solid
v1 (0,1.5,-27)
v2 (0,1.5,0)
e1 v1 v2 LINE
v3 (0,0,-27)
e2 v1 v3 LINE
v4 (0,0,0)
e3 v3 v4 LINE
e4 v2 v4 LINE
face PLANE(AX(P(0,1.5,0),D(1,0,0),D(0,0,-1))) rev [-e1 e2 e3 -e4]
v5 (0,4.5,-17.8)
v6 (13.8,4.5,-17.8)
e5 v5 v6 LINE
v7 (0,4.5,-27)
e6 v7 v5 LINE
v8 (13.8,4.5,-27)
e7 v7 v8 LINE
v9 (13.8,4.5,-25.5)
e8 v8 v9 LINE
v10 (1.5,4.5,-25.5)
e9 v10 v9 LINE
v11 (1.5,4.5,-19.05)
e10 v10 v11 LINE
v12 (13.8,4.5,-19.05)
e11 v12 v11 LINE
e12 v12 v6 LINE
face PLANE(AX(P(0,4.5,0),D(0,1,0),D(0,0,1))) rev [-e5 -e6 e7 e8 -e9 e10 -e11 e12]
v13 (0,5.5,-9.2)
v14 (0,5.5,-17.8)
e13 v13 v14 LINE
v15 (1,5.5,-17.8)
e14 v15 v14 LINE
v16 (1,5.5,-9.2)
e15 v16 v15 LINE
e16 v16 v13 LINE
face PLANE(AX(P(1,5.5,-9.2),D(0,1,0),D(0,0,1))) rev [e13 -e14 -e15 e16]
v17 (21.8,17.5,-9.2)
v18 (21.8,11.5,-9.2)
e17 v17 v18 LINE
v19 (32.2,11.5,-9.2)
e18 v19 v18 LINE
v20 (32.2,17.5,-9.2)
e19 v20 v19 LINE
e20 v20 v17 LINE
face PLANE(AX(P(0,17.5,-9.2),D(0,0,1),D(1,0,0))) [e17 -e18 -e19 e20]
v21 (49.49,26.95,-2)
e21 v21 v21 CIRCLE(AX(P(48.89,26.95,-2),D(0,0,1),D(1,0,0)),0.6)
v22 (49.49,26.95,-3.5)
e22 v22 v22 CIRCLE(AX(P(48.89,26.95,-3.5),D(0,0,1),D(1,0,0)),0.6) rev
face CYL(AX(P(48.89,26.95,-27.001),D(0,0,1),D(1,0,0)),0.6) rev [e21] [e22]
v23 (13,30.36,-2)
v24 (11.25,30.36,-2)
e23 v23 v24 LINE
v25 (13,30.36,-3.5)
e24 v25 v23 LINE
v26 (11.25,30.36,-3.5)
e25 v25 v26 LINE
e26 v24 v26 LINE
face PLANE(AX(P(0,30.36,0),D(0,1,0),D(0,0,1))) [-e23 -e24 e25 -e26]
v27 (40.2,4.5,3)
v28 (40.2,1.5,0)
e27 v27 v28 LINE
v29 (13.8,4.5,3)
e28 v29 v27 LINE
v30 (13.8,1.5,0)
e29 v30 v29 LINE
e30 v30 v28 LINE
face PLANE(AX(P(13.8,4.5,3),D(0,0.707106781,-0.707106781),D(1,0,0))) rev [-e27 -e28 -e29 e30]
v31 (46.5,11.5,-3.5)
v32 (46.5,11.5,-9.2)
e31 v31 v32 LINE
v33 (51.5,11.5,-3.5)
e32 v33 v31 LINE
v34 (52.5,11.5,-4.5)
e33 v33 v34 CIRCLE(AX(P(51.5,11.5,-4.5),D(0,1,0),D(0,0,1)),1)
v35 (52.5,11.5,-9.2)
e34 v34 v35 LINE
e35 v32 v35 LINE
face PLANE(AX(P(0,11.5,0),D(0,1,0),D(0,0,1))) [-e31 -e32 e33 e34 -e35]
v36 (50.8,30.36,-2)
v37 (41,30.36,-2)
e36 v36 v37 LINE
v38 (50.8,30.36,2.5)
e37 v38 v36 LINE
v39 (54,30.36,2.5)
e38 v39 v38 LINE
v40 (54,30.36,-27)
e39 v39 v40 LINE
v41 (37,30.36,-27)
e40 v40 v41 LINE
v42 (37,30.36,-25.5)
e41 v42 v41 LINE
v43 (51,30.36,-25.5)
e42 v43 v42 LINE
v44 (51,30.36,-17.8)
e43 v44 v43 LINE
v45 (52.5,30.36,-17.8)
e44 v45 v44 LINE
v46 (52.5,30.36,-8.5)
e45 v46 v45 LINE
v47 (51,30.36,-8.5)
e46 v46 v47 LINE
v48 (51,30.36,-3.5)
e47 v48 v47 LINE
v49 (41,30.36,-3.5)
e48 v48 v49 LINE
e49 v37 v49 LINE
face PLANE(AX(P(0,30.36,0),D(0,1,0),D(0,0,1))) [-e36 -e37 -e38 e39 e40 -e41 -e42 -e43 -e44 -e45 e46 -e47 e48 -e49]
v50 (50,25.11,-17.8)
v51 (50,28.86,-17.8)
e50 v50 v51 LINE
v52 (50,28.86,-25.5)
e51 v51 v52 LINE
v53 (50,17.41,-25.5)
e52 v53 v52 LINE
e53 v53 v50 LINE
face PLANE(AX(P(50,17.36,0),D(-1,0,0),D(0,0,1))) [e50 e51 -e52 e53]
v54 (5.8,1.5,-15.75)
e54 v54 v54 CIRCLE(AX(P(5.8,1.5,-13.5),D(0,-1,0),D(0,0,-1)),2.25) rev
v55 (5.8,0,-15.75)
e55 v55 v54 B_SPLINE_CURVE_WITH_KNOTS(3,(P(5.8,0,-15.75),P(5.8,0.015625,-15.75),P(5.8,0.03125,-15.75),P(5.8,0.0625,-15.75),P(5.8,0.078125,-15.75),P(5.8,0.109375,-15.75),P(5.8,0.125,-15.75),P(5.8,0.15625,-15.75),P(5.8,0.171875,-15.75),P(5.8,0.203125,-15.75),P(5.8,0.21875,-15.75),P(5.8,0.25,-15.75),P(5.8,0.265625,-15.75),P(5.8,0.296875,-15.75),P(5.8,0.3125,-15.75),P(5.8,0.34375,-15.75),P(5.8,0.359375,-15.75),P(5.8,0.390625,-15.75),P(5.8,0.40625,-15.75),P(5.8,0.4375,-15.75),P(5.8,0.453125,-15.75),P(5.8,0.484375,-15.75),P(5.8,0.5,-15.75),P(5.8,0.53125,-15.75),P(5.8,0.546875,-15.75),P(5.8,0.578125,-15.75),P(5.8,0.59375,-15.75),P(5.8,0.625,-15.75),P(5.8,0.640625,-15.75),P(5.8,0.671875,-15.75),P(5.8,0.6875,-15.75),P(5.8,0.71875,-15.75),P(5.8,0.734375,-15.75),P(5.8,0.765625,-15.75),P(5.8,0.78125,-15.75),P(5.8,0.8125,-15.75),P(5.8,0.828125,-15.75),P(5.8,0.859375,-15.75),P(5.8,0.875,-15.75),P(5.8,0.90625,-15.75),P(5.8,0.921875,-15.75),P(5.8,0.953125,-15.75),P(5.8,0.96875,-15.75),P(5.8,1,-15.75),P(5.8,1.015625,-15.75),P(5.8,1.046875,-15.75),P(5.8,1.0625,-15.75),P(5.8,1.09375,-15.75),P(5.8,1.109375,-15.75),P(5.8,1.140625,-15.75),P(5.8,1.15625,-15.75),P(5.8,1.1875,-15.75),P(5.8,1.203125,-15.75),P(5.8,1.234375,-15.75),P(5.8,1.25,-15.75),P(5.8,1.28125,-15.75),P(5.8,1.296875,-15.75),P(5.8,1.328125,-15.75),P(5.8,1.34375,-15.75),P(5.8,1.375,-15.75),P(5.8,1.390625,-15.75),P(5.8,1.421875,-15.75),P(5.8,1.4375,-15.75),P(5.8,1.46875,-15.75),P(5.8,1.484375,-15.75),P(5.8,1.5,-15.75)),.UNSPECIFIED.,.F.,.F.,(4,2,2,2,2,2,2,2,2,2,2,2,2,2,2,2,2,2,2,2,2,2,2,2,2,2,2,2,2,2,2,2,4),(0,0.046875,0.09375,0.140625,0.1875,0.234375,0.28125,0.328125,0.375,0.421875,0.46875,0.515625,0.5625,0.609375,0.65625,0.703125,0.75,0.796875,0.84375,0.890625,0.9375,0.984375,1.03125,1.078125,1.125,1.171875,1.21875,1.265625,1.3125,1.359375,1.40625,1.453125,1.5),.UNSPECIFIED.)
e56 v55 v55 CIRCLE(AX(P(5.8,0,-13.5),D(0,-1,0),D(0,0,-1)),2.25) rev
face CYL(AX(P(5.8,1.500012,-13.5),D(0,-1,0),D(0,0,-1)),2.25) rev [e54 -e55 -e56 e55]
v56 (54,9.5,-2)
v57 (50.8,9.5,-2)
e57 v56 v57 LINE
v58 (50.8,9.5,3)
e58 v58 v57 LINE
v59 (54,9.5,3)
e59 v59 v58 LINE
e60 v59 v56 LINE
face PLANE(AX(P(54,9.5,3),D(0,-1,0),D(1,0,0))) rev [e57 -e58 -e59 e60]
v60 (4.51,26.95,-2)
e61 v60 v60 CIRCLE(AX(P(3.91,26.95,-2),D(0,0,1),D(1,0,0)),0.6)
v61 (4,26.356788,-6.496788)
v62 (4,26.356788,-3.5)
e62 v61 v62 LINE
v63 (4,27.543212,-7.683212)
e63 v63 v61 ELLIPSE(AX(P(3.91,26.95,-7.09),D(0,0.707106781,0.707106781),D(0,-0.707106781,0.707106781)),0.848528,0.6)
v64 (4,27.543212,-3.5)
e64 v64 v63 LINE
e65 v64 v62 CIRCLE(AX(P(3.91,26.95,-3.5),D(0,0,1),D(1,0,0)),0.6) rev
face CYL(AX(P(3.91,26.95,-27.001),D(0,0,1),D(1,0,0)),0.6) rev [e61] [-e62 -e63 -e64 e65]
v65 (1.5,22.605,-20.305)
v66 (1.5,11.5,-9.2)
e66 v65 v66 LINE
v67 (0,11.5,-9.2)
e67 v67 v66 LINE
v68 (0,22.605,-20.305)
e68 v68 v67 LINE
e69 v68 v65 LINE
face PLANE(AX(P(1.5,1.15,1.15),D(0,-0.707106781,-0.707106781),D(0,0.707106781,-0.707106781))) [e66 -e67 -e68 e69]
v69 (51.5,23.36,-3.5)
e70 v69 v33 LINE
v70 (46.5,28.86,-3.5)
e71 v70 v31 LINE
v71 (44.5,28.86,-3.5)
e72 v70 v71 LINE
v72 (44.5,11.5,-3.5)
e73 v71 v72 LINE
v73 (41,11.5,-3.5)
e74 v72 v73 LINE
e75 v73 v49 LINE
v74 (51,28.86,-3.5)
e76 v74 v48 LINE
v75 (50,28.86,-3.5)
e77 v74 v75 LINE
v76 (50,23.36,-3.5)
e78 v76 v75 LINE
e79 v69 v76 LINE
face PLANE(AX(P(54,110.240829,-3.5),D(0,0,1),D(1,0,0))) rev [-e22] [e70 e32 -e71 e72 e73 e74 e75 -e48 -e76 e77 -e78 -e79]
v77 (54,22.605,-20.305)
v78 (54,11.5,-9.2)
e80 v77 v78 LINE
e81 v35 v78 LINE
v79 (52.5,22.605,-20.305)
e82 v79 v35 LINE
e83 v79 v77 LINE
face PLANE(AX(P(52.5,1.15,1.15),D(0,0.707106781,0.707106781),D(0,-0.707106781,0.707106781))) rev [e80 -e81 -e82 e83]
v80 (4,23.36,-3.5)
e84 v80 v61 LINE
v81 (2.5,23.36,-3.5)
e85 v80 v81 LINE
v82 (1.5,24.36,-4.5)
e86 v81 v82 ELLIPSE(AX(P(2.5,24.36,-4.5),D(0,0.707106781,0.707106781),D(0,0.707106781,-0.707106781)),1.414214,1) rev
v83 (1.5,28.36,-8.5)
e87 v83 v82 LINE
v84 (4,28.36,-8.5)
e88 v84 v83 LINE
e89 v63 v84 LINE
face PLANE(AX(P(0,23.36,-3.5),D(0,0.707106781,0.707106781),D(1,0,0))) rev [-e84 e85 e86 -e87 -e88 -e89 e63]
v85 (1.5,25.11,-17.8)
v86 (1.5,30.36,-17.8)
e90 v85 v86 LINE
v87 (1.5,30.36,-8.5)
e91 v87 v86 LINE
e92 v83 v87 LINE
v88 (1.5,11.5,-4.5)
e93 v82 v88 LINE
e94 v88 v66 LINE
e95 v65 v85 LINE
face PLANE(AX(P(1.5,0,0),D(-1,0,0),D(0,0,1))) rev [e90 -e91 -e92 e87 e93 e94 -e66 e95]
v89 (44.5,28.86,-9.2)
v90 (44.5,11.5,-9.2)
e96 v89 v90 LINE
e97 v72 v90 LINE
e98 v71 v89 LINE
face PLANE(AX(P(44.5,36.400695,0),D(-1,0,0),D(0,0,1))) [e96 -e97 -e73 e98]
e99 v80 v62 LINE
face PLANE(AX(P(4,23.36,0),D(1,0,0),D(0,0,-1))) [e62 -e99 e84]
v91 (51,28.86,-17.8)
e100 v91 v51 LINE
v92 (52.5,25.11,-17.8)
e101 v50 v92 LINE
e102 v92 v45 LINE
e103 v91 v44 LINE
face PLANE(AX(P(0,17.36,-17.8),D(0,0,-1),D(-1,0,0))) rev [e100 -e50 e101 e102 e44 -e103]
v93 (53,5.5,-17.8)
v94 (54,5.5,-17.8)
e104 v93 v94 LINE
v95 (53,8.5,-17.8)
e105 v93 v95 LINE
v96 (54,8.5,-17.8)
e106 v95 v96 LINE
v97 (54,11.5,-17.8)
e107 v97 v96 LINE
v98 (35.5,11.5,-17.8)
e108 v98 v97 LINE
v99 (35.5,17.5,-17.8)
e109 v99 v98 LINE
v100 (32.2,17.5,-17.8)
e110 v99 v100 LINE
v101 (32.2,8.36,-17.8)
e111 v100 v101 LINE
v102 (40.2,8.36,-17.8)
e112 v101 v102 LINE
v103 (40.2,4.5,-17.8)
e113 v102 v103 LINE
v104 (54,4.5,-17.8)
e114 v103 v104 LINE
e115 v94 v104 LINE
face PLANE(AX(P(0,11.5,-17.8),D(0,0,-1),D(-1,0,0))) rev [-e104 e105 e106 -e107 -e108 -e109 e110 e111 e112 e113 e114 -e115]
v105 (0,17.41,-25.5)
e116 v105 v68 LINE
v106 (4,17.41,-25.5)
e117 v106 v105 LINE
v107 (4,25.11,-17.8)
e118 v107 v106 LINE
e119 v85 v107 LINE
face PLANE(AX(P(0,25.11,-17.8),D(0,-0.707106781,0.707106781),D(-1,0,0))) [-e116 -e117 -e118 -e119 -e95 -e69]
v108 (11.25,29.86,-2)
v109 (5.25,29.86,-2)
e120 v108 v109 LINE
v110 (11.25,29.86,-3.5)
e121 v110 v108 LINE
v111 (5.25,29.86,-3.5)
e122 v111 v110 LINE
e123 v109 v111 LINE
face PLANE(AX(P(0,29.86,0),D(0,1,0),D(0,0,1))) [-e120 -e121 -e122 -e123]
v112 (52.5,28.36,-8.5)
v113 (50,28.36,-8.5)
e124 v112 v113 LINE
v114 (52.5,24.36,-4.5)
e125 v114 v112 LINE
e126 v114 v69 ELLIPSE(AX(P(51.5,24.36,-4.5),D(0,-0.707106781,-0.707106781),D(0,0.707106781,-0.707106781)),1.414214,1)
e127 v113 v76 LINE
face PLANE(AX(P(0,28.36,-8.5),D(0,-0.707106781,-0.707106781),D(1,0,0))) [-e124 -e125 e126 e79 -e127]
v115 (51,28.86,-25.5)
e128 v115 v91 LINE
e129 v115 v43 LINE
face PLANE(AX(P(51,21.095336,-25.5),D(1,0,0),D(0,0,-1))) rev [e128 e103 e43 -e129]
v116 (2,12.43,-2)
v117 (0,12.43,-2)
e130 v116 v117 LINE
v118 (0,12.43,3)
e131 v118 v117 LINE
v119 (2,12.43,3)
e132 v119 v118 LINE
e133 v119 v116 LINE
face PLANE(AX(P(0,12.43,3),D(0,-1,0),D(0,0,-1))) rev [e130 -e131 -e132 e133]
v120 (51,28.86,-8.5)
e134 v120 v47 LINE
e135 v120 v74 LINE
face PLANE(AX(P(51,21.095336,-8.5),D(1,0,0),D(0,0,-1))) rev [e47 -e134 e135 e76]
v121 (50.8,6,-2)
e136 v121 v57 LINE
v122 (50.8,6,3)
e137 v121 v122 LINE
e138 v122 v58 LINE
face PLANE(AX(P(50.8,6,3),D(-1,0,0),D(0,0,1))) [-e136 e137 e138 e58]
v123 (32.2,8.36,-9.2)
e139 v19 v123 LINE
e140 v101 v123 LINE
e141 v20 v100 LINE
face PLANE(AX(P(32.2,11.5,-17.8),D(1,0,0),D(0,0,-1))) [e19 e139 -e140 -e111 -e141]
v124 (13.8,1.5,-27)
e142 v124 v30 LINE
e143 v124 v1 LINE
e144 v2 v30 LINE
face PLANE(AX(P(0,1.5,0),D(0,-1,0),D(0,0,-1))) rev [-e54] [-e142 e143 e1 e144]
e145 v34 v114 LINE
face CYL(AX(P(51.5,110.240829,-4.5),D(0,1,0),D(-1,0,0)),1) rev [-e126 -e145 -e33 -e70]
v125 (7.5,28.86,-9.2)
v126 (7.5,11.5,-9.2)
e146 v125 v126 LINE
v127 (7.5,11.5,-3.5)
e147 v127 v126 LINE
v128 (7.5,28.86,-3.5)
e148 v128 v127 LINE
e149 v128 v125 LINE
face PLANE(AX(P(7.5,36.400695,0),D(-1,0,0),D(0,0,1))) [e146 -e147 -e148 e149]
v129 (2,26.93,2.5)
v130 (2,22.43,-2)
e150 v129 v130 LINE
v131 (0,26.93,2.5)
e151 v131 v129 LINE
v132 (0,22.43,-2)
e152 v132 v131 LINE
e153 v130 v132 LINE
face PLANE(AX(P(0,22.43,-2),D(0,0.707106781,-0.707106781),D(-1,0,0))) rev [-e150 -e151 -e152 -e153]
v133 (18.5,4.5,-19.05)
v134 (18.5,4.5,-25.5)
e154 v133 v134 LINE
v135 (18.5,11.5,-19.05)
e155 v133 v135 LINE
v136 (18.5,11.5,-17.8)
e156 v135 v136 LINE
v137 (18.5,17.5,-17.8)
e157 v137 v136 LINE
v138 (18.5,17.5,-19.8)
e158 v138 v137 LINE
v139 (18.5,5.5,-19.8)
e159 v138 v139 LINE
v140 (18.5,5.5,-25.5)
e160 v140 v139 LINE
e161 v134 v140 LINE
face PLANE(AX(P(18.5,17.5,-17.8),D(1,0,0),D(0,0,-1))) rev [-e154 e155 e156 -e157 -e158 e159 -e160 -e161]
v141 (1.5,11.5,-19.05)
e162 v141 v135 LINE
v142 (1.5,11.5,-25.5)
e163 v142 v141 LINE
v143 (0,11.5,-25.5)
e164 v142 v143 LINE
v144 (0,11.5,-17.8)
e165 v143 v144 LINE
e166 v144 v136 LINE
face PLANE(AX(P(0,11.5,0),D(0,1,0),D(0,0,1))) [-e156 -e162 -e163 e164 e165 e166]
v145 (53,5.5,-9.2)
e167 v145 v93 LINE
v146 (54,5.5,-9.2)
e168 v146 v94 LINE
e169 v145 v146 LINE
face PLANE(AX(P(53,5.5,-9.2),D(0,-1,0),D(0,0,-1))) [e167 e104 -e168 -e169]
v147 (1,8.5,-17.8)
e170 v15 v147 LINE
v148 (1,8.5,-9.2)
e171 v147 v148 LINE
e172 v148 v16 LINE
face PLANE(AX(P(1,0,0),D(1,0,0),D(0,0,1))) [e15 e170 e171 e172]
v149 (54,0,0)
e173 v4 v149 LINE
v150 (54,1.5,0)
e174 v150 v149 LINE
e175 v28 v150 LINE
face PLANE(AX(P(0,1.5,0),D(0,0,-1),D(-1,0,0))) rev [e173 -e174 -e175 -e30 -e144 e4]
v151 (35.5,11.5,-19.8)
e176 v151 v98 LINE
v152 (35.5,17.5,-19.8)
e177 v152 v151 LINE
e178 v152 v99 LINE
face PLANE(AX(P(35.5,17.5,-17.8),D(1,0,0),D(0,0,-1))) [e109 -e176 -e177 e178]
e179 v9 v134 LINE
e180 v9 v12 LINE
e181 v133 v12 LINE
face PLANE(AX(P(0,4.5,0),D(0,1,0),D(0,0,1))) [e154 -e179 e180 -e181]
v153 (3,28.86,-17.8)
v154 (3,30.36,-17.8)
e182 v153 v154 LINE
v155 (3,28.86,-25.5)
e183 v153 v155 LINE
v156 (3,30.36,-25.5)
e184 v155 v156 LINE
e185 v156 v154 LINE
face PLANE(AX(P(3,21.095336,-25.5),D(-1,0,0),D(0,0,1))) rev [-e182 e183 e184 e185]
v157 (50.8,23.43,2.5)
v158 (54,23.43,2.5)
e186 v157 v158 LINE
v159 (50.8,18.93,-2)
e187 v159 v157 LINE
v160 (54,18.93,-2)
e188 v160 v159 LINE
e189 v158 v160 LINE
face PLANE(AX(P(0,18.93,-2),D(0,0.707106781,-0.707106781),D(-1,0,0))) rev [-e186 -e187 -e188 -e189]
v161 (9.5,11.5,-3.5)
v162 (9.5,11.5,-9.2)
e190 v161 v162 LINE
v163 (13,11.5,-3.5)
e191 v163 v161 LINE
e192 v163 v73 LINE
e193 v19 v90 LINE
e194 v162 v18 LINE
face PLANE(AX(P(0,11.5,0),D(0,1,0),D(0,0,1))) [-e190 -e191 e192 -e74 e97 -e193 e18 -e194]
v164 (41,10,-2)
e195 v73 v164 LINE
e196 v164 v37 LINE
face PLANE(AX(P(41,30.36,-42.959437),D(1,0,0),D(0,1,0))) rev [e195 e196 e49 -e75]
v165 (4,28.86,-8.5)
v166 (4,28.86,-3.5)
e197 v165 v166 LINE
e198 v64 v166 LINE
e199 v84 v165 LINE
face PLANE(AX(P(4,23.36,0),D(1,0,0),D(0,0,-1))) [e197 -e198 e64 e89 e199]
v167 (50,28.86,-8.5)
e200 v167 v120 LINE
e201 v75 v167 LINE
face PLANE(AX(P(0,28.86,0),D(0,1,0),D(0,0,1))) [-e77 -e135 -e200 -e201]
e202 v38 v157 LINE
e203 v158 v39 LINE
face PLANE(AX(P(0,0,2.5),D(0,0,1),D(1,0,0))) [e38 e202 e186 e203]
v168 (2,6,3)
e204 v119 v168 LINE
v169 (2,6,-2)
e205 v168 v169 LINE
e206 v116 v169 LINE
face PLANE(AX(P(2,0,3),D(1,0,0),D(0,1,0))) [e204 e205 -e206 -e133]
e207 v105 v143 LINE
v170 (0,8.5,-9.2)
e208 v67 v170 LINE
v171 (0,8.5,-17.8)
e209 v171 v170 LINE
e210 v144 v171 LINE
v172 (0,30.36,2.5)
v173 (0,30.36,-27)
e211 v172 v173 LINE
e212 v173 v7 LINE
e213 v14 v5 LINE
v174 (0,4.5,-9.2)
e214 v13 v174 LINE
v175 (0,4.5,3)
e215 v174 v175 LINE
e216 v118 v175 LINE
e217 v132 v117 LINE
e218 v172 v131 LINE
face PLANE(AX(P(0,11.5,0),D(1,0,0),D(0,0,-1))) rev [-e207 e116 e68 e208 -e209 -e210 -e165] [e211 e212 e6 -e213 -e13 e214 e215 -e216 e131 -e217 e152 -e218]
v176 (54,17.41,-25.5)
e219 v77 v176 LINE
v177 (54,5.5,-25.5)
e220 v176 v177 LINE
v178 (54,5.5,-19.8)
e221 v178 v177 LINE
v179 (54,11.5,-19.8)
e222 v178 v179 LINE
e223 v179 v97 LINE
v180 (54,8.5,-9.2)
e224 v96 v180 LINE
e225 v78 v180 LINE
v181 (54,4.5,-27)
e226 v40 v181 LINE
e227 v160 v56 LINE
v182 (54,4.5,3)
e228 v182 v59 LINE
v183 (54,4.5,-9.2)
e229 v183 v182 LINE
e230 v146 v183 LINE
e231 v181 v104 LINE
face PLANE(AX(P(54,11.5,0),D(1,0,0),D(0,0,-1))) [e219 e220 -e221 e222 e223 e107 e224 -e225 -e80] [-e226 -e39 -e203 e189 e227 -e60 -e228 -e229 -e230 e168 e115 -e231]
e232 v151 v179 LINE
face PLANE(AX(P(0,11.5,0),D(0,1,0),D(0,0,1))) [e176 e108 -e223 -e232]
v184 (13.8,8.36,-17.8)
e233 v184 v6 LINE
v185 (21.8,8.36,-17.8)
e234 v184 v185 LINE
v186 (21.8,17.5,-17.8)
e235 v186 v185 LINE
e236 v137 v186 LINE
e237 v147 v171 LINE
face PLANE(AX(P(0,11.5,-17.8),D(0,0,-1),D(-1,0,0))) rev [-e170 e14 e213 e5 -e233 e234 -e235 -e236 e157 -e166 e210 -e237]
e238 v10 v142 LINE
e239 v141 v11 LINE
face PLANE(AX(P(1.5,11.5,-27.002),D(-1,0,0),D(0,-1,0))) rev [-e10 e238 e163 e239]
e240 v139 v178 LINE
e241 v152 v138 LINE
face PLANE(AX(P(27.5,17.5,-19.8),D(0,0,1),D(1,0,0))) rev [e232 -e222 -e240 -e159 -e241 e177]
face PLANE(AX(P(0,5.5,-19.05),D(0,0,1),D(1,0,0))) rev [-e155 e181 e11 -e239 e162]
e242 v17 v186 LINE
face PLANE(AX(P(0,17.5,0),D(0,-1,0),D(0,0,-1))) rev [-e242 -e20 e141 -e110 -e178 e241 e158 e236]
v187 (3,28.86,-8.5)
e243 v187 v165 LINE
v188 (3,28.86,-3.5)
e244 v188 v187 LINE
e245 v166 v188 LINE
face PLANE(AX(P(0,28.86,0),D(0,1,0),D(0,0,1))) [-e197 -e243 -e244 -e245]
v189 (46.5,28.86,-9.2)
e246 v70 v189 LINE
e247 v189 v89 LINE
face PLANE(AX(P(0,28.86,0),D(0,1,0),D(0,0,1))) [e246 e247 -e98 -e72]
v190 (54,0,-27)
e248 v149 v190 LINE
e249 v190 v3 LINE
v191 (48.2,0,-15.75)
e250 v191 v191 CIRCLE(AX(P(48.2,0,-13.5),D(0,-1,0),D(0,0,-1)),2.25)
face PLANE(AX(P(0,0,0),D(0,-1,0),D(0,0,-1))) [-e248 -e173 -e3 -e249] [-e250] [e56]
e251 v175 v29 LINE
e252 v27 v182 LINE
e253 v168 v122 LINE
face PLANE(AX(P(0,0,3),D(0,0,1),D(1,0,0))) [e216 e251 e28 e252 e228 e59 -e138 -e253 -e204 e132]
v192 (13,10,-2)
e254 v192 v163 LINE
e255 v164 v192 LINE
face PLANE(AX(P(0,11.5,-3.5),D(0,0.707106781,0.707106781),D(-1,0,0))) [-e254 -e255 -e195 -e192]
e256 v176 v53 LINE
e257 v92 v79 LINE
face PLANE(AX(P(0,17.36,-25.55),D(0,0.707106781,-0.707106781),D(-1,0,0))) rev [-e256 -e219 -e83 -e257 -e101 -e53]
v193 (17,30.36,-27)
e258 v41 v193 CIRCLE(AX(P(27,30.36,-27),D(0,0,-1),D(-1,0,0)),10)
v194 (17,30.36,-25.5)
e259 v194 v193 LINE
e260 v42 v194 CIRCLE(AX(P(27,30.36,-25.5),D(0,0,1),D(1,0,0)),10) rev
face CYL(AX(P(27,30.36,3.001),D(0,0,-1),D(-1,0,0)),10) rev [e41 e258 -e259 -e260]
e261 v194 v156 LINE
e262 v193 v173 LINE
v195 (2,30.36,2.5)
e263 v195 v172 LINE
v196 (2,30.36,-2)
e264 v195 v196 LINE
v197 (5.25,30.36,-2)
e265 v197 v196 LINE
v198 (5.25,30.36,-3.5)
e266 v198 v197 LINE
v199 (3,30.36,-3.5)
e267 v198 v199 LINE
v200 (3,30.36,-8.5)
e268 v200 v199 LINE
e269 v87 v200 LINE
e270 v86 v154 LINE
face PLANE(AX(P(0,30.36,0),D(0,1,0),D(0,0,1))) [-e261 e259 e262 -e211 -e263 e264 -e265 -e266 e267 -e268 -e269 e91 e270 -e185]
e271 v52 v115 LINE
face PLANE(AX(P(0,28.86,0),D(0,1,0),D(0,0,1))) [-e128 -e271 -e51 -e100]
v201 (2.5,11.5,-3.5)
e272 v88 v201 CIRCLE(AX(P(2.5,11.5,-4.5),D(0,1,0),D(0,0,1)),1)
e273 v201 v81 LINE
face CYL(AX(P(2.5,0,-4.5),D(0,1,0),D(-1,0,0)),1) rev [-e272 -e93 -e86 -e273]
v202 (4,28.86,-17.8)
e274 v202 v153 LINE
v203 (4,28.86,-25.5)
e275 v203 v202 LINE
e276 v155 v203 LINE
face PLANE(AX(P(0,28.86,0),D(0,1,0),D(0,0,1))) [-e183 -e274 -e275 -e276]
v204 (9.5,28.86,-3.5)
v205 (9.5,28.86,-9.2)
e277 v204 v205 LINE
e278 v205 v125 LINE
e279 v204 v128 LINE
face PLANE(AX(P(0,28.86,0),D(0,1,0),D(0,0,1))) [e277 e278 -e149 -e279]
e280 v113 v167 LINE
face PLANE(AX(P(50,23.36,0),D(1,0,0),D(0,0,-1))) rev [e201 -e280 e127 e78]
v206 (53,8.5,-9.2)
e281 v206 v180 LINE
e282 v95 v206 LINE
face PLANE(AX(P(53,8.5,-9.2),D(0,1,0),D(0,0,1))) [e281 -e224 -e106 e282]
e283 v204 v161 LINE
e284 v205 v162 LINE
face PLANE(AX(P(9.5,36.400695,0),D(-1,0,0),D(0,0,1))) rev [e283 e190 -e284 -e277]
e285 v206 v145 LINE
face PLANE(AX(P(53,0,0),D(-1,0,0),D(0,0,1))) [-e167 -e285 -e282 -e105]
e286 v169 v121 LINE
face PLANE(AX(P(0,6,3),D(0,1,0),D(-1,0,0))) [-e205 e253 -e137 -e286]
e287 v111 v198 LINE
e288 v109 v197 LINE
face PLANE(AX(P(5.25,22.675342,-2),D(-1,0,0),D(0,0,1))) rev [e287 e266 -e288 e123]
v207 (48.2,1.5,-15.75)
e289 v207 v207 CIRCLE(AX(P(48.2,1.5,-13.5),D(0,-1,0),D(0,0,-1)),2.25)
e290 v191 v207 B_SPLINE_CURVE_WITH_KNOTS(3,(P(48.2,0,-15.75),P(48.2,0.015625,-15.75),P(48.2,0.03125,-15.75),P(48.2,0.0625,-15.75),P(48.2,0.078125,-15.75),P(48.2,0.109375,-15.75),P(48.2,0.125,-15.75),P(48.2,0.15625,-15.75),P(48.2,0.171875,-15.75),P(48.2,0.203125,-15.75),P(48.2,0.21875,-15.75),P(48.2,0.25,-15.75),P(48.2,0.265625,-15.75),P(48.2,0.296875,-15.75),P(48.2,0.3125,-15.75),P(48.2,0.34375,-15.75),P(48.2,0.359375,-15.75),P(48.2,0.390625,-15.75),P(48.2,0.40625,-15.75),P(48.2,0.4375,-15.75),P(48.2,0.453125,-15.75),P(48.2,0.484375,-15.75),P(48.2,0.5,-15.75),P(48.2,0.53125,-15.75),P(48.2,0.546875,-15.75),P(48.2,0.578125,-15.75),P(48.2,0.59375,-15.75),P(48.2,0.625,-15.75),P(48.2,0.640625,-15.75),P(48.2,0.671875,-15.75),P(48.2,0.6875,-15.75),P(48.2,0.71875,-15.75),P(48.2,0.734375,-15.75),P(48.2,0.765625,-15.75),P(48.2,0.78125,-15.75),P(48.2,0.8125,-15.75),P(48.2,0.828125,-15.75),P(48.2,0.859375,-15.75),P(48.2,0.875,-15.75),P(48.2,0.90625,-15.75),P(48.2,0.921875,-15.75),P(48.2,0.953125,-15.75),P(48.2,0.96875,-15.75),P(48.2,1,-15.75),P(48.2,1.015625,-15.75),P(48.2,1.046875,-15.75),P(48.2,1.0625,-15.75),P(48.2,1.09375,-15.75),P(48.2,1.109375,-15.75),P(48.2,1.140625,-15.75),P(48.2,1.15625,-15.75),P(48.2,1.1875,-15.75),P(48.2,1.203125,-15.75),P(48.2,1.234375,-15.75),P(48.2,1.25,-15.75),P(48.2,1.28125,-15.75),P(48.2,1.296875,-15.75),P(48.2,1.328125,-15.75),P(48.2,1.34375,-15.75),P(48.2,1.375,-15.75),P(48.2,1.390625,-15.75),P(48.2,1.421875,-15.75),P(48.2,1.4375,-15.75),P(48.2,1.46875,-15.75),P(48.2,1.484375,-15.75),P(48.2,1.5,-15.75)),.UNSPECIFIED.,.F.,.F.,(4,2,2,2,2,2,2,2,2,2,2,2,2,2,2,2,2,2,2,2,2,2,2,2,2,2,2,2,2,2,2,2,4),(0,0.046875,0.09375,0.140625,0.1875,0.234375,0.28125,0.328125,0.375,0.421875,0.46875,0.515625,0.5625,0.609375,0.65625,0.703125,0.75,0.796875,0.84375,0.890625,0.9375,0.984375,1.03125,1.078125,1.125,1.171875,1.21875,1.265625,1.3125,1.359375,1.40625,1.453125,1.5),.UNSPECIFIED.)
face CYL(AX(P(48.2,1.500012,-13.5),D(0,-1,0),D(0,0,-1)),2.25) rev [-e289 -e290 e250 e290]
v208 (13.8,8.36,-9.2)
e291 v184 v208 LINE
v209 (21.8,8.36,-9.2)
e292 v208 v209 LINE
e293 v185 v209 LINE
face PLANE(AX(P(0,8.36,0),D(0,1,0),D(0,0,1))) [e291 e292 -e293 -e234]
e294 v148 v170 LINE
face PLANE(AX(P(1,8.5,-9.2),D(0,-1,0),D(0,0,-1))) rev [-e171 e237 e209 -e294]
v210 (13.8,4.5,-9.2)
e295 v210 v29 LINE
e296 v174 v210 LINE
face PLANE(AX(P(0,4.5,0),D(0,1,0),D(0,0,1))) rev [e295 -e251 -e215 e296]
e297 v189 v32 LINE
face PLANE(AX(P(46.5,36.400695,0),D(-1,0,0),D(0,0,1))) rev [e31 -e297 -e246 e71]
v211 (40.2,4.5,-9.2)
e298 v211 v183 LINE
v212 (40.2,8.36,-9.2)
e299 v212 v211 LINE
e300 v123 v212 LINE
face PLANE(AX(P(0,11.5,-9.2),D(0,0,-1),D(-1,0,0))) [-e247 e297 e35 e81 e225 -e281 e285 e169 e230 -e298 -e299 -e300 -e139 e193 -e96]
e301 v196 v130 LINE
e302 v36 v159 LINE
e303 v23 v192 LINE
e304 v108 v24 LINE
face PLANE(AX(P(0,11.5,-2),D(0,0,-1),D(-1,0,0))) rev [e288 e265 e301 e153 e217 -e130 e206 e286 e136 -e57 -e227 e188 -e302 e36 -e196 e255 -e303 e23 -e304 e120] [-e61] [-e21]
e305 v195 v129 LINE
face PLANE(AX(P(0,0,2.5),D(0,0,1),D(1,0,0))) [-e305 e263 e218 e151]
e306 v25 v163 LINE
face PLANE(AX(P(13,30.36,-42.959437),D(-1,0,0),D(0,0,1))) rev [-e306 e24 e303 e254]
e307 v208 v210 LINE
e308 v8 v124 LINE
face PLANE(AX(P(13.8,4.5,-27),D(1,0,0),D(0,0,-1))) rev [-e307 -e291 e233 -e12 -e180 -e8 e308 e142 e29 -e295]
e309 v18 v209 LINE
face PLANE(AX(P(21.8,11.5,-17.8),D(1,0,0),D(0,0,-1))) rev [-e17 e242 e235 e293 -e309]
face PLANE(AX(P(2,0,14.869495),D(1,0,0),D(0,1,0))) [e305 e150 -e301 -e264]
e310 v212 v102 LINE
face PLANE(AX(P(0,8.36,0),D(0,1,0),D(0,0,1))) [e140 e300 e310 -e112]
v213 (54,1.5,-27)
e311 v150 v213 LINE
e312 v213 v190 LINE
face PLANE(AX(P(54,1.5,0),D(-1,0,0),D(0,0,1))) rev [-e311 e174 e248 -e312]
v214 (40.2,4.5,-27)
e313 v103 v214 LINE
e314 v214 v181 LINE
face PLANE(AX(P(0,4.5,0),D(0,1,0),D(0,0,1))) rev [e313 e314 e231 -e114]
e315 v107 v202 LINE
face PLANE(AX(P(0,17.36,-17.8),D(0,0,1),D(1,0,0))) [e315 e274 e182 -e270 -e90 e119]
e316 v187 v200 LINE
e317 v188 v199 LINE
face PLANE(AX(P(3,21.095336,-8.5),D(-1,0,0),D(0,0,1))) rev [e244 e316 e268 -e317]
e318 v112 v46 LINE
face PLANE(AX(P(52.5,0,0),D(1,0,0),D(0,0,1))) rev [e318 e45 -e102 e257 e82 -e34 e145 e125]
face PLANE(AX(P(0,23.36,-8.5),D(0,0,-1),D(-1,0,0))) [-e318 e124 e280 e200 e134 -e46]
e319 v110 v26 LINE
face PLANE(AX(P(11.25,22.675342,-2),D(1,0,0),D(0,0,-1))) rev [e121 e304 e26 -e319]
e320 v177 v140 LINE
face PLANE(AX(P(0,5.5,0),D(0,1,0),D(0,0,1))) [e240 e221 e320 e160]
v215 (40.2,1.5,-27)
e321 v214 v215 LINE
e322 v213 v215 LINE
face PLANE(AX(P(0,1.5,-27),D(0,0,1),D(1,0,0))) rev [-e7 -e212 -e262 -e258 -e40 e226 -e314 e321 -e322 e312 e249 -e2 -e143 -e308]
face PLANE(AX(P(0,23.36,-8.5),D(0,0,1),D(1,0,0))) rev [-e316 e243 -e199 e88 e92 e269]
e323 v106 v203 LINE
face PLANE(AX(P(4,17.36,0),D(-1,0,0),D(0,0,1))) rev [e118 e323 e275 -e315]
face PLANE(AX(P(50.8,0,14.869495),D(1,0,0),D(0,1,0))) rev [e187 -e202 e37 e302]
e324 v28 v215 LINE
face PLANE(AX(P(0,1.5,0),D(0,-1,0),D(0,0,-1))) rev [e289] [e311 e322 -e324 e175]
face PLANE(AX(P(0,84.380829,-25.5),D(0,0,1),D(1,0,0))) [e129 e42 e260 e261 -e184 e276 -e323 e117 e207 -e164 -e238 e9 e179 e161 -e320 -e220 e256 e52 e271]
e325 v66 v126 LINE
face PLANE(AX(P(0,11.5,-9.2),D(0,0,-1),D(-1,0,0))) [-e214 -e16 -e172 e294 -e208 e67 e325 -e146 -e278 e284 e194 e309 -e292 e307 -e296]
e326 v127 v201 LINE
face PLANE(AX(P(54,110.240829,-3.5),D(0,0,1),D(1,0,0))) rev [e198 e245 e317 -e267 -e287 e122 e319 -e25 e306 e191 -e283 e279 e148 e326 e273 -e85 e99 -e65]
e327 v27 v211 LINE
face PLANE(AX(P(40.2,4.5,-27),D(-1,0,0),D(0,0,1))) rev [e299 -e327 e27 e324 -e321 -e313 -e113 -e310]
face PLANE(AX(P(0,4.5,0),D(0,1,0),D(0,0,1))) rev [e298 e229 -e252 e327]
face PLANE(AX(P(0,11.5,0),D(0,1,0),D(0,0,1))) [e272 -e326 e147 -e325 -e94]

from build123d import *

# Parameters (mm, degrees)
SKETCH1_W                      = 54
SKETCH1_H                      = 27
BOSS_EXTRUDE1_DEPTH            = 1.5
CUT_EXTRUDE1_REACH             = 62.392
SKETCH2_R                      = 2.25
CUT_EXTRUDE1_DIRECTION_2_DEPTH = 61.392466418
SKETCH3_W                      = 26.4
SKETCH3_H                      = 30
BOSS_EXTRUDE2_DEPTH            = 3
CHAMFER3_SIZE                  = 3
BOSS_EXTRUDE3_DEPTH            = 7
SKETCH25_W                     = 8.6
SKETCH25_H                     = 3
BOSS_EXTRUDE19_DEPTH           = 1
BOSS_EXTRUDE15_START           = 7
SKETCH4_4_W                    = 10.4
SKETCH4_4_H                    = 8.6
BOSS_EXTRUDE15_DEPTH           = 6
SKETCH5_W                      = 54
SKETCH5_H                      = 1.5
BOSS_EXTRUDE5_DEPTH            = 18.86
SKETCH5_3_W                    = 2
SKETCH5_3_H                    = 5.7
BOSS_EXTRUDE6_DEPTH            = 17.36
SKETCH4_3_W                    = 8
SKETCH4_3_H                    = 8.6
BOSS_EXTRUDE12_DEPTH           = 3.86
SKETCH17_W                     = 2
SKETCH17_H                     = 6.43
SKETCH17_W_2                   = 3.2
SKETCH17_H_2                   = 3.5
BOSS_EXTRUDE13_DEPTH           = 5
SKETCH17_3_W                   = 2
SKETCH17_3_H                   = 7.93
SKETCH17_3_W_2                 = 3.2
SKETCH17_3_H_2                 = 11.43
BOSS_EXTRUDE16_DEPTH           = 4.5
CHAMFER7_SIZE                  = 4.5
SKETCH5_4_W                    = 54
SKETCH5_4_H                    = 1.5
BOSS_EXTRUDE8_DEPTH            = 18.86
BOSS_EXTRUDE9_DEPTH            = 1.5
SKETCH18_W                     = 4
SKETCH18_H                     = 7.7
BOSS_EXTRUDE14_DEPTH           = 13
SKETCH18_3_W                   = 2.5
SKETCH18_3_H                   = 5
BOSS_EXTRUDE17_DEPTH           = 7
CHAMFER8_SIZE                  = 5
CHAMFER6_SIZE                  = 7.75
SKETCH20_W                     = 1
SKETCH20_H                     = 7.7
SKETCH20_H_2                   = 5
CUT_EXTRUDE7_DEPTH             = 1.5
SKETCH22_W                     = 6
SKETCH22_H                     = 1.5
CUT_EXTRUDE10_DEPTH            = 0.5
SKETCH12_W                     = 28
SKETCH12_H                     = 18.86
CUT_EXTRUDE2_DEPTH             = 7.2
CUT_EXTRUDE3_DEPTH             = 1.5
SKETCH15_W                     = 9
SKETCH15_H                     = 2
BOSS_EXTRUDE11_DEPTH           = 6
SKETCH21_W                     = 18.5
SKETCH21_H                     = 5.7
SKETCH21_H_2                   = 0.75
CUT_EXTRUDE8_DEPTH             = 6
CUT_EXTRUDE9_START             = -6
SKETCH21_3_W                   = 18.5
SKETCH21_3_H                   = 5.7
SKETCH21_3_H_2                 = 0.75
CUT_EXTRUDE9_DEPTH             = 1
FILLET7_R                      = 1
CUT_EXTRUDE11_REACH            = 68.804
SKETCH23_R                     = 0.6
CHAMFER9_SIZE                  = 1.5
BOSS_EXTRUDE18_REACH           = 67.757
SKETCH24_W                     = 1.5
SKETCH24_H                     = 7


# Some blends are built 0.0001 mm under size
with BuildPart() as part:
    # Sketch1 → Boss-Extrude1 (new body)
    with BuildSketch(Plane(origin=(0, 0, 0), x_dir=(1, 0, 0), z_dir=(0, 1, 0))):
        with Locations((27, 13.5)):
            Rectangle(SKETCH1_W, SKETCH1_H)
    extrude(amount=BOSS_EXTRUDE1_DEPTH)

    # Sketch2 → Cut-Extrude1 (cut, up to next)
    with BuildSketch(Plane(origin=(0, 1.5, 0), x_dir=(1, 0, 0), z_dir=(0, 1, 0)), mode=Mode.PRIVATE) as cut_extrude1_sk1:
        with Locations(Location((5.8, 13.5, 0), (0, 0, 90))):
            Circle(SKETCH2_R)
    cut_extrude1_tool1 = extrude(cut_extrude1_sk1.sketch, amount=-CUT_EXTRUDE1_REACH, mode=Mode.PRIVATE) & part.part
    cut_extrude1 = cut_extrude1_tool1.solids().sort_by_distance((5.8, 1.5, -13.5))[0]
    add(cut_extrude1, mode=Mode.SUBTRACT)

    # Sketch2 → Cut-Extrude1 direction 2 (cut)
    with BuildSketch(Plane(origin=(0, 1.5, 0), x_dir=(1, 0, 0), z_dir=(0, 1, 0))):
        with Locations(Location((5.8, 13.5, 0), (0, 0, 90))):
            Circle(SKETCH2_R)
    cut_extrude1_direction_2 = extrude(amount=CUT_EXTRUDE1_DIRECTION_2_DEPTH, mode=Mode.SUBTRACT)

    # Mirror1: Cut-Extrude1, Cut-Extrude1 direction 2 across plane
    add(cut_extrude1.mirror(Plane.ZY.offset(-27)), mode=Mode.SUBTRACT)
    add(cut_extrude1_direction_2.mirror(Plane.ZY.offset(-27)), mode=Mode.SUBTRACT)

    # Sketch3 → Boss-Extrude2 (add)
    with BuildSketch(Plane(origin=(0, 1.5, 0), x_dir=(1, 0, 0), z_dir=(0, 1, 0))):
        with Locations((27, 12)):
            Rectangle(SKETCH3_W, SKETCH3_H)
    extrude(amount=BOSS_EXTRUDE2_DEPTH)

    # Chamfer3
    chamfer3_edges = [part.edges().sort_by_distance(p)[0] for p in [
        (27, 1.5, 3),
    ]]
    chamfer(chamfer3_edges, length=CHAMFER3_SIZE - 0.0001)  # a hair under: the kernel refuses the full size

    # Sketch4 → Boss-Extrude3 (add)
    with BuildSketch(Plane(origin=(0, 4.5, 0), x_dir=(1, 0, 0), z_dir=(0, 1, 0))):
        Polygon((54, 27), (0, 27), (0, 17.8), (21.8, 17.8), (21.8, 9.2), (0, 9.2), (0, 2), (54, 2), (54, 9.2), (32.2, 9.2), (32.2, 17.8), (54, 17.8), align=None)
    extrude(amount=BOSS_EXTRUDE3_DEPTH)

    # Sketch25 → Boss-Extrude19 (add)
    with BuildSketch(Plane(origin=(54, 0, 0), x_dir=(0, 0, -1), z_dir=(1, 0, 0))):
        with Locations((13.5, 7)):
            Rectangle(SKETCH25_W, SKETCH25_H)
    boss_extrude19 = extrude(amount=-BOSS_EXTRUDE19_DEPTH)

    # Mirror6: Boss-Extrude19 across plane
    add(boss_extrude19.mirror(Plane.ZY.offset(-27)))

    # Sketch4<4> → Boss-Extrude15 (add)
    with BuildSketch(Plane(origin=(0, 4.5, 0), x_dir=(1, 0, 0), z_dir=(0, 1, 0)).offset(BOSS_EXTRUDE15_START)):
        with Locations((27, 13.5)):
            Rectangle(SKETCH4_4_W, SKETCH4_4_H)
    extrude(amount=BOSS_EXTRUDE15_DEPTH)

    # Sketch5 → Boss-Extrude5 (add)
    with BuildSketch(Plane(origin=(0, 11.5, 0), x_dir=(1, 0, 0), z_dir=(0, 1, 0))):
        with Locations((27, 2.75)):
            Rectangle(SKETCH5_W, SKETCH5_H)
    extrude(amount=BOSS_EXTRUDE5_DEPTH)

    # Sketch5<3> → Boss-Extrude6 (add)
    with BuildSketch(Plane(origin=(0, 11.5, 0), x_dir=(1, 0, 0), z_dir=(0, 1, 0))):
        with Locations((45.5, 6.35)):
            Rectangle(SKETCH5_3_W, SKETCH5_3_H)
        with Locations((8.5, 6.35)):
            Rectangle(SKETCH5_3_W, SKETCH5_3_H)
    extrude(amount=BOSS_EXTRUDE6_DEPTH)

    # Sketch4<3> → Boss-Extrude12 (add)
    with BuildSketch(Plane(origin=(0, 4.5, 0), x_dir=(1, 0, 0), z_dir=(0, 1, 0))):
        with Locations((17.8, 13.5)):
            Rectangle(SKETCH4_3_W, SKETCH4_3_H)
        with Locations((36.2, 13.5)):
            Rectangle(SKETCH4_3_W, SKETCH4_3_H)
    extrude(amount=BOSS_EXTRUDE12_DEPTH)

    # Sketch17 → Boss-Extrude13 (add)
    with BuildSketch(Plane.XY.offset(-2)):
        with Locations((1, 9.215)):
            Rectangle(SKETCH17_W, SKETCH17_H)
        Polygon((0, 6), (0, 4.5), (13.8, 4.5), (40.2, 4.5), (54, 4.5), (54, 6), (50.8, 6), (2, 6), align=None)
        with Locations((52.4, 7.75)):
            Rectangle(SKETCH17_W_2, SKETCH17_H_2)
    extrude(amount=BOSS_EXTRUDE13_DEPTH)

    # Sketch17<3> → Boss-Extrude16 (add)
    with BuildSketch(Plane.XY.offset(-2)):
        with Locations((1, 26.395)):
            Rectangle(SKETCH17_3_W, SKETCH17_3_H)
        with Locations((52.4, 24.645)):
            Rectangle(SKETCH17_3_W_2, SKETCH17_3_H_2)
    extrude(amount=BOSS_EXTRUDE16_DEPTH)

    # Chamfer7
    chamfer7_edges = [part.edges().sort_by_distance(p)[0] for p in [
        (52.4, 18.93, 2.5),
        (1, 22.43, 2.5),
    ]]
    chamfer(chamfer7_edges, length=CHAMFER7_SIZE - 0.0001)  # a hair under: the kernel refuses the full size

    # Sketch5<4> → Boss-Extrude8 (add)
    with BuildSketch(Plane(origin=(0, 11.5, 0), x_dir=(1, 0, 0), z_dir=(0, 1, 0))):
        with Locations((27, 26.25)):
            Rectangle(SKETCH5_4_W, SKETCH5_4_H)
    extrude(amount=BOSS_EXTRUDE8_DEPTH)

    # Sketch10 → Boss-Extrude9 (add)
    with BuildSketch(Plane.ZY):
        Polygon((-3.5, 11.5), (-3.5, 30.36), (-25.5, 30.36), (-25.5, 27.8), (-9.2, 11.5), align=None)
    boss_extrude9 = extrude(amount=-BOSS_EXTRUDE9_DEPTH)

    # Mirror3: Boss-Extrude9 across plane
    add(boss_extrude9.mirror(Plane.ZY.offset(-27)))

    # Sketch18 → Boss-Extrude14 (add)
    with BuildSketch(Plane(origin=(0, 30.36, 0), x_dir=(1, 0, 0), z_dir=(0, 1, 0))):
        with Locations((2, 21.65)):
            Rectangle(SKETCH18_W, SKETCH18_H)
        with Locations((52, 21.65)):
            Rectangle(SKETCH18_W, SKETCH18_H)
    extrude(amount=-BOSS_EXTRUDE14_DEPTH)

    # Sketch18<3> → Boss-Extrude17 (add)
    with BuildSketch(Plane(origin=(0, 30.36, 0), x_dir=(1, 0, 0), z_dir=(0, 1, 0))):
        with Locations((51.25, 6)):
            Rectangle(SKETCH18_3_W, SKETCH18_3_H)
        with Locations((2.75, 6)):
            Rectangle(SKETCH18_3_W, SKETCH18_3_H)
    extrude(amount=-BOSS_EXTRUDE17_DEPTH)

    # Chamfer8
    chamfer8_edges = [part.edges().sort_by_distance(p)[0] for p in [
        (51.25, 23.36, -8.5),
        (2.75, 23.36, -8.5),
    ]]
    chamfer(chamfer8_edges, length=CHAMFER8_SIZE - 0.0001)  # a hair under: the kernel refuses the full size

    # Chamfer6
    # the kernel refuses this chamfer: 7.75 mm, written as the material it takes off along each edge
    with BuildSketch(Plane(origin=(-19.930543157, 17.36, -17.8), x_dir=(0, 0.9996219169112968, 0.027495876610586188), z_dir=(1, 0, 0))) as chamfer6_piece_1_section:
        Polygon((CHAMFER6_SIZE * 0.999621916911, -CHAMFER6_SIZE * 0.0274958766106), (-CHAMFER6_SIZE * 0.0274958766106, -CHAMFER6_SIZE * 0.999621916911), (0, 0), align=None)
    chamfer6_piece_1 = extrude(amount=43.861086313, mode=Mode.PRIVATE)
    chamfer6_piece_1 = split(chamfer6_piece_1, bisect_by=Plane(origin=(0.75, 21.216778897, -18.916778897), z_dir=(0, -0.7071067811865515, -0.7071067811865436)), keep=Keep.TOP, mode=Mode.PRIVATE)
    chamfer6_piece_1 = split(chamfer6_piece_1, bisect_by=Plane(origin=(0.75, 19.326101078, -25.5), z_dir=(0, 0, 1)), keep=Keep.TOP, mode=Mode.PRIVATE)
    add(chamfer6_piece_1, mode=Mode.SUBTRACT)
    with BuildSketch(Plane(origin=(-19.930543157, 17.36, -17.8), x_dir=(0, 0.9996219169112968, 0.027495876610586188), z_dir=(1, 0, 0))) as chamfer6_piece_2_section:
        Polygon((CHAMFER6_SIZE * 0.999621916911, -CHAMFER6_SIZE * 0.0274958766106), (-CHAMFER6_SIZE * 0.0274958766106, -CHAMFER6_SIZE * 0.999621916911), (0, 0), align=None)
    chamfer6_piece_2 = extrude(amount=43.861086313, mode=Mode.PRIVATE)
    chamfer6_piece_2 = split(chamfer6_piece_2, bisect_by=Plane(origin=(1.5, 22.605, -18.635), z_dir=(1, 0, 0)), keep=Keep.TOP, mode=Mode.PRIVATE)
    chamfer6_piece_2 = split(chamfer6_piece_2, bisect_by=Plane(origin=(2.75, 17.5, -18.635), z_dir=(0, 1, 0)), keep=Keep.TOP, mode=Mode.PRIVATE)
    add(chamfer6_piece_2, mode=Mode.SUBTRACT)
    with BuildSketch(Plane(origin=(30.069456843, 17.36, -17.8), x_dir=(0, 0.9996219169112968, 0.027495876610586188), z_dir=(1, 0, 0))) as chamfer6_piece_3_section:
        Polygon((CHAMFER6_SIZE * 0.999621916911, -CHAMFER6_SIZE * 0.0274958766106), (-CHAMFER6_SIZE * 0.0274958766106, -CHAMFER6_SIZE * 0.999621916911), (0, 0), align=None)
    chamfer6_piece_3 = extrude(amount=43.861086313, mode=Mode.PRIVATE)
    chamfer6_piece_3 = split(chamfer6_piece_3, bisect_by=Plane(origin=(51.25, 22.605, -25.5), z_dir=(0, 0, 1)), keep=Keep.TOP, mode=Mode.PRIVATE)
    chamfer6_piece_3 = split(chamfer6_piece_3, bisect_by=Plane(origin=(52.5, 22.605, -18.635), z_dir=(-1, 0, 0)), keep=Keep.TOP, mode=Mode.PRIVATE)
    add(chamfer6_piece_3, mode=Mode.SUBTRACT)
    with BuildSketch(Plane(origin=(30.069456843, 17.36, -17.8), x_dir=(0, 0.9996219169112968, 0.027495876610586188), z_dir=(1, 0, 0))) as chamfer6_piece_4_section:
        Polygon((CHAMFER6_SIZE * 0.999621916911, -CHAMFER6_SIZE * 0.0274958766106), (-CHAMFER6_SIZE * 0.0274958766106, -CHAMFER6_SIZE * 0.999621916911), (0, 0), align=None)
    chamfer6_piece_4 = extrude(amount=43.861086313, mode=Mode.PRIVATE)
    chamfer6_piece_4 = split(chamfer6_piece_4, bisect_by=Plane(origin=(53.25, 19.326101078, -25.5), z_dir=(0, 0, 1)), keep=Keep.TOP, mode=Mode.PRIVATE)
    chamfer6_piece_4 = split(chamfer6_piece_4, bisect_by=Plane(origin=(53.25, 21.216778897, -18.916778897), z_dir=(0, -0.7071067811865515, -0.7071067811865436)), keep=Keep.TOP, mode=Mode.PRIVATE)
    add(chamfer6_piece_4, mode=Mode.SUBTRACT)

    # Sketch20 → Cut-Extrude7 (cut)
    with BuildSketch(Plane(origin=(0, 30.36, 0), x_dir=(1, 0, 0), z_dir=(0, 1, 0))):
        with Locations((3.5, 21.65)):
            Rectangle(SKETCH20_W, SKETCH20_H)
        with Locations((50.5, 21.65)):
            Rectangle(SKETCH20_W, SKETCH20_H)
        with Locations((3.5, 6)):
            Rectangle(SKETCH20_W, SKETCH20_H_2)
        with Locations((50.5, 6)):
            Rectangle(SKETCH20_W, SKETCH20_H_2)
    extrude(amount=-CUT_EXTRUDE7_DEPTH, mode=Mode.SUBTRACT)

    # Sketch22 → Cut-Extrude10 (cut)
    with BuildSketch(Plane(origin=(0, 30.36, 0), x_dir=(1, 0, 0), z_dir=(0, 1, 0))):
        with Locations((8.25, 2.75)):
            Rectangle(SKETCH22_W, SKETCH22_H)
    extrude(amount=-CUT_EXTRUDE10_DEPTH, mode=Mode.SUBTRACT)

    # Sketch12 → Cut-Extrude2 (cut)
    with BuildSketch(Plane.XY.offset(-2)):
        with Locations((27, 20.93)):
            Rectangle(SKETCH12_W, SKETCH12_H)
    extrude(amount=-CUT_EXTRUDE2_DEPTH, mode=Mode.SUBTRACT)

    # Sketch14 → Cut-Extrude3 (cut)
    with BuildSketch(Plane(origin=(0, 0, -27), x_dir=(-1, 0, 0), z_dir=(0, 0, -1))):
        with BuildLine():
            ThreePointArc((-17, 30.36), (-27, 40.36), (-37, 30.36))
            Line((-37, 30.36), (-17, 30.36))
        make_face()
        with BuildLine():
            Line((-17, 30.36), (-37, 30.36))
            ThreePointArc((-37, 30.36), (-27, 20.36), (-17, 30.36))
        make_face()
    extrude(amount=-CUT_EXTRUDE3_DEPTH, mode=Mode.SUBTRACT)

    # Sketch15 → Boss-Extrude11 (add)
    with BuildSketch(Plane(origin=(0, 11.5, 0), x_dir=(1, 0, 0), z_dir=(0, 1, 0))):
        with Locations((23, 18.8)):
            Rectangle(SKETCH15_W, SKETCH15_H)
    boss_extrude11 = extrude(amount=BOSS_EXTRUDE11_DEPTH)

    # Mirror5: Boss-Extrude11 across plane
    add(boss_extrude11.mirror(Plane.ZY.offset(-27)))

    # Sketch21 → Cut-Extrude8 (cut)
    with BuildSketch(Plane(origin=(0, 11.5, 0), x_dir=(1, 0, 0), z_dir=(0, 1, 0))):
        Polygon((54, 25.5), (18.5, 25.5), (18.5, 19.8), (35.5, 19.8), (54, 19.8), align=None)
        with Locations((9.25, 22.65)):
            Rectangle(SKETCH21_W, SKETCH21_H)
        with Locations((9.25, 19.425)):
            Rectangle(SKETCH21_W, SKETCH21_H_2)
    extrude(amount=-CUT_EXTRUDE8_DEPTH, mode=Mode.SUBTRACT)

    # Sketch21<3> → Cut-Extrude9 (cut)
    with BuildSketch(Plane(origin=(0, 11.5, 0), x_dir=(1, 0, 0), z_dir=(0, 1, 0)).offset(CUT_EXTRUDE9_START)):
        with Locations((9.25, 22.65)):
            Rectangle(SKETCH21_3_W, SKETCH21_3_H)
        with Locations((9.25, 19.425)):
            Rectangle(SKETCH21_3_W, SKETCH21_3_H_2)
    extrude(amount=-CUT_EXTRUDE9_DEPTH, mode=Mode.SUBTRACT)

    # Fillet7
    fillet7_edges = [part.edges().sort_by_distance(p)[0] for p in [
        (1.5, 17.43, -3.5),
        (52.5, 17.43, -3.5),
    ]]
    fillet(fillet7_edges, radius=FILLET7_R)

    # Sketch23 → Cut-Extrude11 (cut, up to next)
    with BuildSketch(Plane.XY.offset(-2), mode=Mode.PRIVATE) as cut_extrude11_sk1:
        with Locations((3.91, 26.95)):
            Circle(SKETCH23_R)
    cut_extrude11_tool1 = extrude(cut_extrude11_sk1.sketch, amount=-CUT_EXTRUDE11_REACH, mode=Mode.PRIVATE) & part.part
    # Sketch23 → Cut-Extrude11 (cut, up to next)
    with BuildSketch(Plane.XY.offset(-2), mode=Mode.PRIVATE) as cut_extrude11_sk2:
        with Locations((48.89, 26.95)):
            Circle(SKETCH23_R)
    cut_extrude11_tool2 = extrude(cut_extrude11_sk2.sketch, amount=-CUT_EXTRUDE11_REACH, mode=Mode.PRIVATE) & part.part
    add(cut_extrude11_tool1.solids().sort_by_distance((3.91, 26.95, -2))[0], mode=Mode.SUBTRACT)
    add(cut_extrude11_tool2.solids().sort_by_distance((48.89, 26.95, -2))[0], mode=Mode.SUBTRACT)

    # Chamfer9
    chamfer9_edges = [part.edges().sort_by_distance(p)[0] for p in [
        (27, 11.5, -2),
    ]]
    chamfer(chamfer9_edges, length=CHAMFER9_SIZE)

    # Sketch24 → Boss-Extrude18 (add, up to next)
    with BuildSketch(Plane(origin=(0, 0, -19.05), x_dir=(-1, 0, 0), z_dir=(0, 0, -1)), mode=Mode.PRIVATE) as boss_extrude18_sk1:
        with Locations((-0.75, 8)):
            Rectangle(SKETCH24_W, SKETCH24_H)
    boss_extrude18_tool1 = extrude(boss_extrude18_sk1.sketch, amount=BOSS_EXTRUDE18_REACH, mode=Mode.PRIVATE) - part.part
    add(boss_extrude18_tool1.solids().sort_by_distance((0.75, 8, -19.05))[0])


solid = part.part
